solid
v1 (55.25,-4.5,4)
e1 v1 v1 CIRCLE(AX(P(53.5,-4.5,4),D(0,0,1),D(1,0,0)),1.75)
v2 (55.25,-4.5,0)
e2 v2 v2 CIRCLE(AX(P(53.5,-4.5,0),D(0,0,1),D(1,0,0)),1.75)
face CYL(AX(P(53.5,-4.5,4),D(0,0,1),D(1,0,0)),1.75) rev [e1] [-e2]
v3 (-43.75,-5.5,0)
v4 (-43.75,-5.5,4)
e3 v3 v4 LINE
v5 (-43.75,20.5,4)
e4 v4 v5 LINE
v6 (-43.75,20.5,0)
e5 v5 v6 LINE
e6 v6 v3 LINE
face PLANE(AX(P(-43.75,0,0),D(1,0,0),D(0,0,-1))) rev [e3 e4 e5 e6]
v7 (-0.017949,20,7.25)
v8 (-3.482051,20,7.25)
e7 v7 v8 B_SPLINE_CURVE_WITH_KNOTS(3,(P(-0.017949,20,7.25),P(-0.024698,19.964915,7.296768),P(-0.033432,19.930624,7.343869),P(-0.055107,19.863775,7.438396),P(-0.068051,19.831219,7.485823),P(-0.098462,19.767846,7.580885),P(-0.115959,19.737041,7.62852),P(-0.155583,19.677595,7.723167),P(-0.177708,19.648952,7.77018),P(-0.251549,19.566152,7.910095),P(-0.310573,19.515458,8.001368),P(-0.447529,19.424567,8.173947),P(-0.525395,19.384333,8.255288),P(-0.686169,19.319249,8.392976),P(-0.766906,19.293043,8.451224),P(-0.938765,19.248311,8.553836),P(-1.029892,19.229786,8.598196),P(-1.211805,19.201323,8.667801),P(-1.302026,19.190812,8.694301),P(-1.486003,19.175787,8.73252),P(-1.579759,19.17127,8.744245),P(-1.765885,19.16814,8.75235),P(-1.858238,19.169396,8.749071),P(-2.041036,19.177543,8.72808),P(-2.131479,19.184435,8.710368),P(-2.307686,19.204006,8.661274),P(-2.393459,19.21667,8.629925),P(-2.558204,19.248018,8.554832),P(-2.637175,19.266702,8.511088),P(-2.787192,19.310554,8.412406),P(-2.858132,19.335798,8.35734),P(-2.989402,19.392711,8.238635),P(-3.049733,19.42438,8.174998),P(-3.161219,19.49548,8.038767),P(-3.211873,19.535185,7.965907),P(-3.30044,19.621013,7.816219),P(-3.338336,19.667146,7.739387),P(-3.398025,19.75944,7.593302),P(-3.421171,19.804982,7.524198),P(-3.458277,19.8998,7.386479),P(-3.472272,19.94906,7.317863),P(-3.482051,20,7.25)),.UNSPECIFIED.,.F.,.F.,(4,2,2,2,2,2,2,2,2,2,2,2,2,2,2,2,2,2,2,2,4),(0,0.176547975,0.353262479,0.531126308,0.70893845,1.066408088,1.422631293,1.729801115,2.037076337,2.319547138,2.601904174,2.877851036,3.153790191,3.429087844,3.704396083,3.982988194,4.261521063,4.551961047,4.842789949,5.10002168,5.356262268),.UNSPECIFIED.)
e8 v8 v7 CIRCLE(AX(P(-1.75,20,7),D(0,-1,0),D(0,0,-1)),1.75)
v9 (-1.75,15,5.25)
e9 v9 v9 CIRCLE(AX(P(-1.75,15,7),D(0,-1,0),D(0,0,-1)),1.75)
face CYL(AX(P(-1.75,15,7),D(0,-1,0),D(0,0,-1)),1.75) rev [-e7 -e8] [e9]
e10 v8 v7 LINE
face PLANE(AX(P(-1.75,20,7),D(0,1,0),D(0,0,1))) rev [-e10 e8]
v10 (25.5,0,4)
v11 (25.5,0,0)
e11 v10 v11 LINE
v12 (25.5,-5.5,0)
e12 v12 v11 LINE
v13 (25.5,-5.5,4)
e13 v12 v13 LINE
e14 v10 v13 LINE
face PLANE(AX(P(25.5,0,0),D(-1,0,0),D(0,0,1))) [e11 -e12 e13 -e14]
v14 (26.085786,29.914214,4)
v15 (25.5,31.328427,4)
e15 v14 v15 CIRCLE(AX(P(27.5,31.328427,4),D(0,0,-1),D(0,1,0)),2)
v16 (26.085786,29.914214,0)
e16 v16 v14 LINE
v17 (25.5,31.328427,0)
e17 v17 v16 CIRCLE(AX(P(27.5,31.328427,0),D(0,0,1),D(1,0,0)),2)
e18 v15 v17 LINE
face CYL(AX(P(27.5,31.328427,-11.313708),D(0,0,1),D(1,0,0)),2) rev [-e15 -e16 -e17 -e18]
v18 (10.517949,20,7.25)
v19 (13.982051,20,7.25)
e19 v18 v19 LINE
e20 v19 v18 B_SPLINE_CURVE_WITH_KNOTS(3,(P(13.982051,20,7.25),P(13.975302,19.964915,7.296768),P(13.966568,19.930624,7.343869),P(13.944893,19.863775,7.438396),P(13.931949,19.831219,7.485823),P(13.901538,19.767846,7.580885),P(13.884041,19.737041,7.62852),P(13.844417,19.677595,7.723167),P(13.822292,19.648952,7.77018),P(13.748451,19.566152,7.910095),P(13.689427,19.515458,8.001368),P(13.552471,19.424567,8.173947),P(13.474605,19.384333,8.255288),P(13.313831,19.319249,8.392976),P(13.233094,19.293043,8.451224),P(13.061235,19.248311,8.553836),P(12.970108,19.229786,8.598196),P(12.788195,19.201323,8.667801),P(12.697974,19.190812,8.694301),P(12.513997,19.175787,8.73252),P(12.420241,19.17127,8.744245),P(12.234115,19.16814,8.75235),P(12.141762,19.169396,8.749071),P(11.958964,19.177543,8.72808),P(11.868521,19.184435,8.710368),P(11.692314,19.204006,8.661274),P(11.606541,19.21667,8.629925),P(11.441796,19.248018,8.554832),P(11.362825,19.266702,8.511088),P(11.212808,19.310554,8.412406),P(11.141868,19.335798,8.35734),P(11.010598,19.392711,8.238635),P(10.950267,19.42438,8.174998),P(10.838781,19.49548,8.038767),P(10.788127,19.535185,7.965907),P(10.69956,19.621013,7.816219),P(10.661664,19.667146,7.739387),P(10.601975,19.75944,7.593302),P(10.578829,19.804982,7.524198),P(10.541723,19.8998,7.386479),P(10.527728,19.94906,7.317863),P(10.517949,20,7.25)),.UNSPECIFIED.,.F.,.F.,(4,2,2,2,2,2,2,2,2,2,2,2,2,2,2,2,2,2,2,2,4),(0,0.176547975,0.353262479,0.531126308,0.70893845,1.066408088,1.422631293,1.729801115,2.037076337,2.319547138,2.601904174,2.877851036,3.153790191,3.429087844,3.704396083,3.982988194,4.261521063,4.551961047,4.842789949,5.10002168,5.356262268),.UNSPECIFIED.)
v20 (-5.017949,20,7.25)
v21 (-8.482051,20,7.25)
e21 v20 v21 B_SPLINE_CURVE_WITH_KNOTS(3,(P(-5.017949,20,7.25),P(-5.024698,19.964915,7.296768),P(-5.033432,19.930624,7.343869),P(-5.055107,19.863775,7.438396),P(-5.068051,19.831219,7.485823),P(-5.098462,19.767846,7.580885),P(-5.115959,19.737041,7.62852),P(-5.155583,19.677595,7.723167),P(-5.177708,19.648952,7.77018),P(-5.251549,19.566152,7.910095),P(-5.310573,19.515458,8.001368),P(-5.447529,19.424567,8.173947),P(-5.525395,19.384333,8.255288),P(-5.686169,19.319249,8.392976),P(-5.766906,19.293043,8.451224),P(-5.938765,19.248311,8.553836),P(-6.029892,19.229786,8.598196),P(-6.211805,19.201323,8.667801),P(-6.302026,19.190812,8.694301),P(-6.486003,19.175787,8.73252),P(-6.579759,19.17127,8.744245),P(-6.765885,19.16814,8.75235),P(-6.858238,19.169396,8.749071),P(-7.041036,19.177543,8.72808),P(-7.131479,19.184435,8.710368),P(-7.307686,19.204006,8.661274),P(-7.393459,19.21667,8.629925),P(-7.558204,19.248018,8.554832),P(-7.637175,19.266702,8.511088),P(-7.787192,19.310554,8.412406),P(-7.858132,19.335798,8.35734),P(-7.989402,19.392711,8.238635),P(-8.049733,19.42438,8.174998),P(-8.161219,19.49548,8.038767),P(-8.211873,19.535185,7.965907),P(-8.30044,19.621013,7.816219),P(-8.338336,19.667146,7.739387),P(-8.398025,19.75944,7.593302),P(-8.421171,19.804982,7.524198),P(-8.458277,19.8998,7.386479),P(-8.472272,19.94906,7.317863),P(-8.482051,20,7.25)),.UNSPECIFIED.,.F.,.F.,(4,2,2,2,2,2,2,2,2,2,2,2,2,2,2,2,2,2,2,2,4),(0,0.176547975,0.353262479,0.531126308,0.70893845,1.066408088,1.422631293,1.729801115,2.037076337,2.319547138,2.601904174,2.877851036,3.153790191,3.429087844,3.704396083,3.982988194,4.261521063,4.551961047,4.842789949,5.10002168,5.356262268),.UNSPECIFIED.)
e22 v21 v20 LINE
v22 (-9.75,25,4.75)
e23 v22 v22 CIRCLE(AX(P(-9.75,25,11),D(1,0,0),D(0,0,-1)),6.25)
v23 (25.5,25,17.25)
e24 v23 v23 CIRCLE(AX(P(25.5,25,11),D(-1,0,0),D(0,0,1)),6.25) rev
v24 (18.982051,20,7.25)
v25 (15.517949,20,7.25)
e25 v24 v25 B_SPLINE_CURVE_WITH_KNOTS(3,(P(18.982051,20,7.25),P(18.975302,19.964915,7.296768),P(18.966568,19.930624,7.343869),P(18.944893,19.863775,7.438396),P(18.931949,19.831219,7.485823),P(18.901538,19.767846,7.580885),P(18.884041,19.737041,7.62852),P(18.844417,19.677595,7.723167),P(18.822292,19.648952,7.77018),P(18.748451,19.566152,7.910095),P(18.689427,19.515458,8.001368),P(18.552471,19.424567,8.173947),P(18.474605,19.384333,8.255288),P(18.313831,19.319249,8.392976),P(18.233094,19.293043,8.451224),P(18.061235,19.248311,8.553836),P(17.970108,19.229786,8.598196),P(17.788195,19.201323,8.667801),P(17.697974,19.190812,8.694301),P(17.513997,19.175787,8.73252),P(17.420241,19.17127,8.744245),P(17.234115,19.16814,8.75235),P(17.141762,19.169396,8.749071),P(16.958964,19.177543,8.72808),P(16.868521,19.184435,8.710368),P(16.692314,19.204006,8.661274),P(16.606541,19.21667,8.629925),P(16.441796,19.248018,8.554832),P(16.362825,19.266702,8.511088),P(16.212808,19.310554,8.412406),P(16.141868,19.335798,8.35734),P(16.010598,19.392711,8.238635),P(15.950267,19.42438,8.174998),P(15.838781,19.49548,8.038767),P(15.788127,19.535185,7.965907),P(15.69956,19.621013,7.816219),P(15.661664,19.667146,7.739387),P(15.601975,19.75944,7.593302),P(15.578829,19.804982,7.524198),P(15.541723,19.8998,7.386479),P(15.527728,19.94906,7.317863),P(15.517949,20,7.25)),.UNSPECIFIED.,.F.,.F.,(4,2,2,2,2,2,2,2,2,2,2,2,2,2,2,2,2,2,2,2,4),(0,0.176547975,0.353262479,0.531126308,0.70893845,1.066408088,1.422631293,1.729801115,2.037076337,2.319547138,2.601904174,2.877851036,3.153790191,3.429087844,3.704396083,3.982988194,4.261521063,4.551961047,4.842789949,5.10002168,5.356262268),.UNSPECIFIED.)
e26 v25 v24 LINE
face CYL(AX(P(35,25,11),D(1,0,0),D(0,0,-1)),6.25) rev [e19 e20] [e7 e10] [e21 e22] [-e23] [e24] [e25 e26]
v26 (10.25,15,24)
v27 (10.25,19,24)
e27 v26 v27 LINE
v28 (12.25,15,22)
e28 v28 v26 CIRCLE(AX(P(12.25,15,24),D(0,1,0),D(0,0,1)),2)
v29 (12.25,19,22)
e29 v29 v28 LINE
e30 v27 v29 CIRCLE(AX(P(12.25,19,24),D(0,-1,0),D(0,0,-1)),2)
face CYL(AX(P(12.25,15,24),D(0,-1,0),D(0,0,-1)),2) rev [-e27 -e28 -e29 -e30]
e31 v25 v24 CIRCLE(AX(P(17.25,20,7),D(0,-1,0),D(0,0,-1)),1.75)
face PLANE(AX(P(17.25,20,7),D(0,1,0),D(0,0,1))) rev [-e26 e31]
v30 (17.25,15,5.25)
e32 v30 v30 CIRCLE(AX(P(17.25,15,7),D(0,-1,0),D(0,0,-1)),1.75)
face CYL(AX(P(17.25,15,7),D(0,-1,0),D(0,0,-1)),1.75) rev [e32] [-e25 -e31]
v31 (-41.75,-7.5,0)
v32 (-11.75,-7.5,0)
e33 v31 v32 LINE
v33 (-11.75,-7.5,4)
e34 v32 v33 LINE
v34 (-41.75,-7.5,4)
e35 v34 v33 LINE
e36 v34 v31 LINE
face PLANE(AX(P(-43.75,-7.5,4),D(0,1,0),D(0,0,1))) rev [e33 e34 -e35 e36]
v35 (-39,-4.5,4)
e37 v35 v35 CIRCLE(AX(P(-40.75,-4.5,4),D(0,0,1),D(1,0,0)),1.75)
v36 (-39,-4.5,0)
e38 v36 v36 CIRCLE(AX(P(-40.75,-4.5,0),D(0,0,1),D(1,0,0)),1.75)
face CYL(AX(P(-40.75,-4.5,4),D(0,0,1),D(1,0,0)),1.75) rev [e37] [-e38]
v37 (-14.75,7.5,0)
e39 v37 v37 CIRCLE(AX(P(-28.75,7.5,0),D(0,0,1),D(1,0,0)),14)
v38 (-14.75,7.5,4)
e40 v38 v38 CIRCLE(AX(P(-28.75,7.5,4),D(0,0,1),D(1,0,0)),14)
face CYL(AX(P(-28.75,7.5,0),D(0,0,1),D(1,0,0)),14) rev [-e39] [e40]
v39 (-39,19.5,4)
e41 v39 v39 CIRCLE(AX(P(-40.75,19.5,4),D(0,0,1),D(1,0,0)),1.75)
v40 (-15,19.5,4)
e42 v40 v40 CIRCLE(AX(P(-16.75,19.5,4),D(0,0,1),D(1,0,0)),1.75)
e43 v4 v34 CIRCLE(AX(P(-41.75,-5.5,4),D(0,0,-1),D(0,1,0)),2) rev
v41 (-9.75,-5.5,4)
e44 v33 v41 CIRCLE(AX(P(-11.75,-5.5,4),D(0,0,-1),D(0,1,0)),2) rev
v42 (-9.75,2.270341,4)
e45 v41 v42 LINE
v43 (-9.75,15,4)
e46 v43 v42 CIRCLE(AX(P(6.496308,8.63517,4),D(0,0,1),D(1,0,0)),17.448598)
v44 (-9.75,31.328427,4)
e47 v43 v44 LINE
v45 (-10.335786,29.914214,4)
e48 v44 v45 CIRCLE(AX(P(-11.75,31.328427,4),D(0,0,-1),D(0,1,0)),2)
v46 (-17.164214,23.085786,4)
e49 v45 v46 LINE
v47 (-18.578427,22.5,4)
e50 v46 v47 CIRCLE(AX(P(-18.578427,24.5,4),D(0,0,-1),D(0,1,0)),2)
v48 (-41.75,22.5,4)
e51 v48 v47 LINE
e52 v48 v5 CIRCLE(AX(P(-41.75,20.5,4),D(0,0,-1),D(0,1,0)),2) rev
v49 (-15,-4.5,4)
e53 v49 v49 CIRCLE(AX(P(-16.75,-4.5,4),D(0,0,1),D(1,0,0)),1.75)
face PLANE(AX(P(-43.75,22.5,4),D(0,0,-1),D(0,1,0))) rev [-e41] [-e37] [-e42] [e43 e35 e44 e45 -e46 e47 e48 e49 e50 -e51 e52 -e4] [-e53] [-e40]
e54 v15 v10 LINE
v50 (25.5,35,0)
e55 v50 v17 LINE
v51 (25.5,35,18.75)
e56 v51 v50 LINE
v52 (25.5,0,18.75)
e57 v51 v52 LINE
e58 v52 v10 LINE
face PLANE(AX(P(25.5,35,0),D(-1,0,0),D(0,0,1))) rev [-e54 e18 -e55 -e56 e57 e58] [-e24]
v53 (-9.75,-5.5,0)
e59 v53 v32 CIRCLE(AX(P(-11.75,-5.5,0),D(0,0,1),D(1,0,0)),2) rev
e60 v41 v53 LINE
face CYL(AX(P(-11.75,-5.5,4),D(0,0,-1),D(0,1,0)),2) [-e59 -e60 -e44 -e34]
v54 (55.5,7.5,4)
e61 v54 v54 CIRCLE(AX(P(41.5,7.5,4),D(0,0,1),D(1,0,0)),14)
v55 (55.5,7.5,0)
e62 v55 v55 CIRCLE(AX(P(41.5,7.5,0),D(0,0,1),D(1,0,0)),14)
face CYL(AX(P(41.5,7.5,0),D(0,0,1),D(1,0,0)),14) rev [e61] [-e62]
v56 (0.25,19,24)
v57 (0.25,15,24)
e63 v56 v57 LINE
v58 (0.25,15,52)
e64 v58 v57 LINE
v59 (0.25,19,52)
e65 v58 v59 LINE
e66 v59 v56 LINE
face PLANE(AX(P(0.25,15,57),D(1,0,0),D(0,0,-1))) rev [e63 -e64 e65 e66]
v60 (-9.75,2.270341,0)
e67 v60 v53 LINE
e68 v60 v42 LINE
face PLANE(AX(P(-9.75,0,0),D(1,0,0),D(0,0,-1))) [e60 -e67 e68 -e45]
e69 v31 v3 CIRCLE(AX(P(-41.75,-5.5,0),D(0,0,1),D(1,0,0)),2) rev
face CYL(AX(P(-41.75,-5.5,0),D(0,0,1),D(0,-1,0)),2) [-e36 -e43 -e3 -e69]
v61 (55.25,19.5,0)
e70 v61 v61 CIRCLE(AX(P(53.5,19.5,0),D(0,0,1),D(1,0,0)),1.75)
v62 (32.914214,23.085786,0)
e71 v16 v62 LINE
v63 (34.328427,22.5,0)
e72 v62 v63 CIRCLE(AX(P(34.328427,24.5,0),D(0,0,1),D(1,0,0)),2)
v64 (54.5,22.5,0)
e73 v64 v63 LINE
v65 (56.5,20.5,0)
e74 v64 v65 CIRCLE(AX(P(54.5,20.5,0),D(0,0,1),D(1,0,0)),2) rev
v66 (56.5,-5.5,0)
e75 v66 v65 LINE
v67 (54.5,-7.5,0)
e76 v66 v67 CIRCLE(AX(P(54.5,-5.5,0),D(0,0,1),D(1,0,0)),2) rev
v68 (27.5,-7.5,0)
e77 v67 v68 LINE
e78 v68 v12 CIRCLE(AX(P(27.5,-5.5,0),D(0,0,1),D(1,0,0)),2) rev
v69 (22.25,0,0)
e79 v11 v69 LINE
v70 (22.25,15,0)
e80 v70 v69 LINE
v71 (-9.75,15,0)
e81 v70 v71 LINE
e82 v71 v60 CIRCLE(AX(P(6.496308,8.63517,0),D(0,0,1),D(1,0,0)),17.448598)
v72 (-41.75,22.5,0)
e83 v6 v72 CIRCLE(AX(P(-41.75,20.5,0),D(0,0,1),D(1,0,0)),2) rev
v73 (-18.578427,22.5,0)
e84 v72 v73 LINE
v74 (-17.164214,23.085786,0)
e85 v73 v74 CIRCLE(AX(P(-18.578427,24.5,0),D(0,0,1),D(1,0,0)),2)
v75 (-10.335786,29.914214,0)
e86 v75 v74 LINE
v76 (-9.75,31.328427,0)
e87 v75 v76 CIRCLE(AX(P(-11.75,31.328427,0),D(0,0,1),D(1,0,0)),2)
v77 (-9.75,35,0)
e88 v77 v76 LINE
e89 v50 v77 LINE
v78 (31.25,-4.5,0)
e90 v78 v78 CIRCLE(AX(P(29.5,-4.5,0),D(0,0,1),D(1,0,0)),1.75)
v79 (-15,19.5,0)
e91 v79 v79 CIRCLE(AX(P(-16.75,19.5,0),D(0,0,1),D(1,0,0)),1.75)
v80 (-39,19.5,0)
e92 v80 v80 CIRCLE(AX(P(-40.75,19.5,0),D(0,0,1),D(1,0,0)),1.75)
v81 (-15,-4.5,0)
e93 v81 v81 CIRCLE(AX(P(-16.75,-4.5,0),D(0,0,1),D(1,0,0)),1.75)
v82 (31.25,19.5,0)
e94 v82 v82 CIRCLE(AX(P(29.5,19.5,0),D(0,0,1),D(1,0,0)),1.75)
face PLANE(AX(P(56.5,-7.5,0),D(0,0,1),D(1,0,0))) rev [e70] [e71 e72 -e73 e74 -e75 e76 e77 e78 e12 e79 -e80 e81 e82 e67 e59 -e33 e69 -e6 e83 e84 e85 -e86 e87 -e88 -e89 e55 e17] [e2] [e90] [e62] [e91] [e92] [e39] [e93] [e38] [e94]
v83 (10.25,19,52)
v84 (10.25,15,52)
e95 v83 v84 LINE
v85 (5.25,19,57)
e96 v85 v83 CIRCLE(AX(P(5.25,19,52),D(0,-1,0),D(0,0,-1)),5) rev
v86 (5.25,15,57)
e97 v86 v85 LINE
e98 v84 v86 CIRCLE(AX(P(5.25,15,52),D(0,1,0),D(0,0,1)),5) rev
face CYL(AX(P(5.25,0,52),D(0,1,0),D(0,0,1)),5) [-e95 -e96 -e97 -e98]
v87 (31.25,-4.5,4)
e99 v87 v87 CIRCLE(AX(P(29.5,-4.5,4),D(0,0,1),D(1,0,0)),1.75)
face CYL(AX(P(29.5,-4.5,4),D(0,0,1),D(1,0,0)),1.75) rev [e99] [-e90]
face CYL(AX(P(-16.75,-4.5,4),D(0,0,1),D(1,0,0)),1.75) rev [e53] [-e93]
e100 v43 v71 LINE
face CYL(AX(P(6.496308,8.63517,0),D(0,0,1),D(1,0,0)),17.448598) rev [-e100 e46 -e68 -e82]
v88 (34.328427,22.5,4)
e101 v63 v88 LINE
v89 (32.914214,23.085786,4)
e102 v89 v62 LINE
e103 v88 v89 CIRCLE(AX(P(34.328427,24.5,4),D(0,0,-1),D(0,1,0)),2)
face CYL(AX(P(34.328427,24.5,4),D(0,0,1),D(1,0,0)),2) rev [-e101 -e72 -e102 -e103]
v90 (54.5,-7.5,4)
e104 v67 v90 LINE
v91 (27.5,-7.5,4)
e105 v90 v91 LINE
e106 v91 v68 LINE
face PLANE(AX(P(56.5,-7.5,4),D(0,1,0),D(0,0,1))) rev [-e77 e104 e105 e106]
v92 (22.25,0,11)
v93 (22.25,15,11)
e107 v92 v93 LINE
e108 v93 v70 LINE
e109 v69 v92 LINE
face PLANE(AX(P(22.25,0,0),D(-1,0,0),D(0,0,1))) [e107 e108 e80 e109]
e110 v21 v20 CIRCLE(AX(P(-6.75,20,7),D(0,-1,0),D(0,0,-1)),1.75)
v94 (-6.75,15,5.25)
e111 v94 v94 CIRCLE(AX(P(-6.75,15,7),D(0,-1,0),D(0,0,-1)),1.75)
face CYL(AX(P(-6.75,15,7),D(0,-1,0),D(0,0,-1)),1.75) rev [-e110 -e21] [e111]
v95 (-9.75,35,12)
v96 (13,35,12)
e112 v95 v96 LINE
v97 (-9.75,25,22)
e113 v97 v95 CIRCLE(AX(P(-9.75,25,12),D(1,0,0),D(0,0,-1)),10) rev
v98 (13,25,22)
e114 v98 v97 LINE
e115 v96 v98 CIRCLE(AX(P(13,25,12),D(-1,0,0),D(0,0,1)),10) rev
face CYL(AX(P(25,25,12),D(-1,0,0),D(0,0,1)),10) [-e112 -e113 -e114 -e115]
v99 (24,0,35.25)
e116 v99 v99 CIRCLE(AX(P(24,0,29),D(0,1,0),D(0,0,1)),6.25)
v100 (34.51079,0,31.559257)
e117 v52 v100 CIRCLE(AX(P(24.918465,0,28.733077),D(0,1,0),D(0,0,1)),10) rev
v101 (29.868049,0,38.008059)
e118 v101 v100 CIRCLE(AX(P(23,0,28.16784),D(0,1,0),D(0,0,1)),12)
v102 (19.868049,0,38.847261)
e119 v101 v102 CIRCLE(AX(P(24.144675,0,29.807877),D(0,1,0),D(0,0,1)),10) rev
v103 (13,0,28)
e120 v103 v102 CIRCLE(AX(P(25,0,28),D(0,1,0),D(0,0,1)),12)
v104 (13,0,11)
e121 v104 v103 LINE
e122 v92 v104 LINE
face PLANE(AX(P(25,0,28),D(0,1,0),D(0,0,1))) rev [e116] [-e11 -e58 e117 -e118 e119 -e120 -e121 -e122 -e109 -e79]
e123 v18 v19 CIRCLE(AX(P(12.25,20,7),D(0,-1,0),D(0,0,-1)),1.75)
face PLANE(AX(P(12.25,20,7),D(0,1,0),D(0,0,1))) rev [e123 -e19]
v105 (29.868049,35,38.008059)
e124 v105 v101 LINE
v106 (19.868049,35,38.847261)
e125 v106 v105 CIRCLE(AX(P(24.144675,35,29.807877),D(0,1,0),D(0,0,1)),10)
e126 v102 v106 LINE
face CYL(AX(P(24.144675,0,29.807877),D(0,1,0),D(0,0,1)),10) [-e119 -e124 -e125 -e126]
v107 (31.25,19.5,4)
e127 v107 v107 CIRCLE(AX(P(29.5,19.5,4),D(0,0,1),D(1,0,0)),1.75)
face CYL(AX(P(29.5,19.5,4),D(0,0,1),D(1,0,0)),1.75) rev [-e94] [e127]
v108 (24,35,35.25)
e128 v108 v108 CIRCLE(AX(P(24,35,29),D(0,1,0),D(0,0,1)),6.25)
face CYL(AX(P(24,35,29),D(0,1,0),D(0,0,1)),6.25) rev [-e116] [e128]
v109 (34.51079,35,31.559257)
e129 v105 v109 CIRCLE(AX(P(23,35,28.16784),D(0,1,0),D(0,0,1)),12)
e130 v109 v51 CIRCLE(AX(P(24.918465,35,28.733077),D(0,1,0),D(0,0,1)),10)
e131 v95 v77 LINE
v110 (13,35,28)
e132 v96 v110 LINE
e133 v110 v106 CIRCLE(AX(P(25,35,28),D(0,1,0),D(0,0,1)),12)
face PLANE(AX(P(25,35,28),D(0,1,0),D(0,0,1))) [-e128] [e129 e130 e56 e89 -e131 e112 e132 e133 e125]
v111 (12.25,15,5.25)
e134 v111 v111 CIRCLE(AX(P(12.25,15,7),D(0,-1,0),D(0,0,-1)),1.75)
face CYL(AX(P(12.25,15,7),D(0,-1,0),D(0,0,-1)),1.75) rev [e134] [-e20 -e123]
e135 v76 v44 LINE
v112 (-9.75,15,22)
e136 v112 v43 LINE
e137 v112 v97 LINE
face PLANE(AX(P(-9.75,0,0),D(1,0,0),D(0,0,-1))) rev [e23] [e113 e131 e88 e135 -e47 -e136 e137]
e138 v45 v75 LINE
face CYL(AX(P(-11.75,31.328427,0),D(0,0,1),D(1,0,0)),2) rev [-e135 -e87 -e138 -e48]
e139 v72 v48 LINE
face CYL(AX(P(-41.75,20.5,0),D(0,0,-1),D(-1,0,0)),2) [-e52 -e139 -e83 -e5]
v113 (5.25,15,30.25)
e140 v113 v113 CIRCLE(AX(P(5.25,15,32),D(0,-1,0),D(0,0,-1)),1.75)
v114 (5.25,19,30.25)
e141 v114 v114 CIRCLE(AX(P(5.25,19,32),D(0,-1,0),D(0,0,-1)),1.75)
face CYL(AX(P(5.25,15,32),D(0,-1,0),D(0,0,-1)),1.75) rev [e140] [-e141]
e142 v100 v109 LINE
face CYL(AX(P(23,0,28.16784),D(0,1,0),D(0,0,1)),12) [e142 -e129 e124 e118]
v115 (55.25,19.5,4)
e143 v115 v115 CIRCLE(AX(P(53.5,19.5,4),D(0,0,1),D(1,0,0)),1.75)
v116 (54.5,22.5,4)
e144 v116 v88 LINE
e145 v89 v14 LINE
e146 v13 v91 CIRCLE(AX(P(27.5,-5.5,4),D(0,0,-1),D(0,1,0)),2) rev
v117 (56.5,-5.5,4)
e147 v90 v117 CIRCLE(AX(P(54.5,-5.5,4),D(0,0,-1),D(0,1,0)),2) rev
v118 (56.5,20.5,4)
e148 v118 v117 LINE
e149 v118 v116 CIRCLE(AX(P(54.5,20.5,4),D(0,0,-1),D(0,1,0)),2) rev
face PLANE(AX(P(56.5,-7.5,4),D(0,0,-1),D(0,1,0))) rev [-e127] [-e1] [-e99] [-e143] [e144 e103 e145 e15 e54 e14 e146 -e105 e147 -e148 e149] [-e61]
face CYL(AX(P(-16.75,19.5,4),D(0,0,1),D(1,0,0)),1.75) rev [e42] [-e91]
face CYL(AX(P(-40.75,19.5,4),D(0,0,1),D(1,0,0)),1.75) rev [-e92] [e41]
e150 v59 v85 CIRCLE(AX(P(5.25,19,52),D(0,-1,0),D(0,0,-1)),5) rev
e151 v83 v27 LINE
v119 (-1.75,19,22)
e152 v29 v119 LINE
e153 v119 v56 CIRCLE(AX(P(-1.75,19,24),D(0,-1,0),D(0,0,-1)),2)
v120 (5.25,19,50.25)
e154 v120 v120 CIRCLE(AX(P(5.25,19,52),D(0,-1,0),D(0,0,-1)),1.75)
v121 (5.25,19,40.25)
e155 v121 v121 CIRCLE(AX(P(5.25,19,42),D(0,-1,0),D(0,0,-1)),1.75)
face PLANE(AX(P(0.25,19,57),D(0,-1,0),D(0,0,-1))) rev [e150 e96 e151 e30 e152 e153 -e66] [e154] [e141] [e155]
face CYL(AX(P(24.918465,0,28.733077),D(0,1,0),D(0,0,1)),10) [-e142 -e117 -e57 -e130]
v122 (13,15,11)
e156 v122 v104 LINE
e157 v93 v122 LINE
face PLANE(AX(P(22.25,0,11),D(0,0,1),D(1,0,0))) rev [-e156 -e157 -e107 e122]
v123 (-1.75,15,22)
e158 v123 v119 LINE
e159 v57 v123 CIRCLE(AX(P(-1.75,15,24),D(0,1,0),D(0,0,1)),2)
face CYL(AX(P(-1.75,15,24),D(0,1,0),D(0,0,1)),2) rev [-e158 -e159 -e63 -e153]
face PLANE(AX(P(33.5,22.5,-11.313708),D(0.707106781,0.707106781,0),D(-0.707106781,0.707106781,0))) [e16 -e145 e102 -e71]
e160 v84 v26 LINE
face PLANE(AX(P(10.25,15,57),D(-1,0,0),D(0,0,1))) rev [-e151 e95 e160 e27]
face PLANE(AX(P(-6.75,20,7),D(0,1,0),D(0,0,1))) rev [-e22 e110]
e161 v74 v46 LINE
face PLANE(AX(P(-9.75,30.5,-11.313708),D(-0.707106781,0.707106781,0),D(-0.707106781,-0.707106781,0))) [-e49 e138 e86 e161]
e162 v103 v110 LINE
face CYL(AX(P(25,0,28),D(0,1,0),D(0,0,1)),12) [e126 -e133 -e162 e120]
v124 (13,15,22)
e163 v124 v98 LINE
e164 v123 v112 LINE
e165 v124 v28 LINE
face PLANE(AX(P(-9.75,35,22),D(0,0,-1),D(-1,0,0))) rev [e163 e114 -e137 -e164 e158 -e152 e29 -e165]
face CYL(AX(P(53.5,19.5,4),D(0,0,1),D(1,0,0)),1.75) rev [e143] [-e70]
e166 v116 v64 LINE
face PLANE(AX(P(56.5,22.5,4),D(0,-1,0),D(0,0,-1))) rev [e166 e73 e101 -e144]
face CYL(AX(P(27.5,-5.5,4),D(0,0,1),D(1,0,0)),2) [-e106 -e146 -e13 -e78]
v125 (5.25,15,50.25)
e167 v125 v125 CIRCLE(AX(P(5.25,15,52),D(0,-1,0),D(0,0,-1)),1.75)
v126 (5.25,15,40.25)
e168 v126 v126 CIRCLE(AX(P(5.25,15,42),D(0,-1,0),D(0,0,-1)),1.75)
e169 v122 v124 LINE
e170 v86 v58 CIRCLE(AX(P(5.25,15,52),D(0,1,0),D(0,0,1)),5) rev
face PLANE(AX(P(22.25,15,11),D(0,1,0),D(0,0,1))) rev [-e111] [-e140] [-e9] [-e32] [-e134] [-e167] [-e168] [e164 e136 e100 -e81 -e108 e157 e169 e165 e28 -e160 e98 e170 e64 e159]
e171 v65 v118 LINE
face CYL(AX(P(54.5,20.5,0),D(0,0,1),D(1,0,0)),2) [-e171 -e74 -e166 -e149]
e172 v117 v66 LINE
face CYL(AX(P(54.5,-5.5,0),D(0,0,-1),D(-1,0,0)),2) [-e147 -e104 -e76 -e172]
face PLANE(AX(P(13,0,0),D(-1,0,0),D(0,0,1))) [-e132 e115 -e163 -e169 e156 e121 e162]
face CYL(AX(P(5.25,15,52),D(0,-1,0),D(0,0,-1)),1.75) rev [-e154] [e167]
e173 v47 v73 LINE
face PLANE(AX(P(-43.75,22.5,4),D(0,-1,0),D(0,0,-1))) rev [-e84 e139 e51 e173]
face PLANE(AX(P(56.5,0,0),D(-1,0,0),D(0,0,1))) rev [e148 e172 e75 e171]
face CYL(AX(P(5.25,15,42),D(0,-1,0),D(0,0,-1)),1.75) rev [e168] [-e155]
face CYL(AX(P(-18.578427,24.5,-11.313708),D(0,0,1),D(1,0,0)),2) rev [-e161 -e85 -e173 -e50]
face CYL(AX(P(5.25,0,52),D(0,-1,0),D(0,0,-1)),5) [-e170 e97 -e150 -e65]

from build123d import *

# Parameters (mm, degrees)
EXTRUDE_1_DEPTH                  = 35
SKETCH_2_W                       = 22
SKETCH_2_H                       = 35
EXTRUDE_2_DEPTH                  = 22.75
SKETCH_3_W                       = 11
SKETCH_3_H                       = 15
CUT_EXTRUDE_1_DEPTH              = 32
HOLE_WIZARD_12_5_12_5_1_D        = 12.5
HOLE_WIZARD_12_5_12_5_2_D        = 12.5
HOLE_WIZARD_3_5_3_5_1_D          = 3.5
HOLE_WIZARD_3_5_3_5_1_DEPTH      = 5
SKETCH_10_W                      = 9.5
SKETCH_10_H                      = 18.75
CUT_EXTRUDE_2_DEPTH              = 64.639610362
SKETCH_11_W                      = 22.75
SKETCH_11_H                      = 11
CUT_EXTRUDE_3_DEPTH              = 15
FILLET_2_R                       = 10
SKETCH_13_W                      = 4
SKETCH_13_H                      = 30
EXTRUDE_3_DEPTH                  = 31
SKETCH_16_W                      = 1.75
SKETCH_16_H                      = 4
HOLE_WIZARD_3_5_3_5_2_AT_2_COUNT = 2
HOLE_WIZARD_3_5_3_5_2_AT_2_PITCH = 24
HOLE_WIZARD_3_5_3_5_2_AT_3_COUNT = 2
HOLE_WIZARD_3_5_3_5_2_AT_3_PITCH = 33.941125497
HOLE_WIZARD_3_5_3_5_2_AT_4_COUNT = 2
HOLE_WIZARD_3_5_3_5_2_AT_4_PITCH = 24
SKETCH_17_R                      = 14
CUT_EXTRUDE_4_DEPTH              = 76.494728698
SKETCH_19_W                      = 4
SKETCH_19_H                      = 30
EXTRUDE_5_DEPTH                  = 34
SKETCH_20_R                      = 14
CUT_EXTRUDE_5_DEPTH              = 76.494728698
SKETCH_22_W                      = 1.75
SKETCH_22_H                      = 4
HOLE_WIZARD_3_5_3_5_3_AT_2_COUNT = 2
HOLE_WIZARD_3_5_3_5_3_AT_2_PITCH = 24
HOLE_WIZARD_3_5_3_5_3_AT_3_COUNT = 2
HOLE_WIZARD_3_5_3_5_3_AT_3_PITCH = 33.941125497
HOLE_WIZARD_3_5_3_5_3_AT_4_COUNT = 2
HOLE_WIZARD_3_5_3_5_3_AT_4_PITCH = 24
EXTRUDE_6_DEPTH                  = 4
EXTRUDE_7_DEPTH                  = 4
SKETCH_26_W                      = 10
SKETCH_26_H                      = 4
EXTRUDE_8_DEPTH                  = 35
HOLE_WIZARD_3_5_3_5_4_D          = 3.5
FILLET_7_R                       = 2
FILLET_9_R                       = 5
FILLET_10_R                      = 10
FILLET_12_R                      = 10
FILLET_13_R                      = 2
FILLET_14_R                      = 2
CUT_EXTRUDE_6_DEPTH              = 86.007352664


# Some blends are built 0.0001 mm under size
with BuildPart() as part:
    # Эскиз1 → Бобышка-Вытянуть1 (new body)
    with BuildSketch(Plane(origin=(0, 35, 0), x_dir=(1, 0, 0), z_dir=(0, 1, 0))):
        with BuildLine():
            Line((35, 0), (13, 0))
            Line((13, 0), (13, -28))
            ThreePointArc((13, -28), (16.514718626, -36.485281374), (25, -40))
            ThreePointArc((25, -40), (32.16515139, -35.913807126), (35, -28.167840434))
            Line((35, -28.167840434), (35, 0))
        make_face()
    extrude(amount=-EXTRUDE_1_DEPTH)

    # Эскиз2 → Бобышка-Вытянуть2 (add)
    with BuildSketch(Plane.ZY.offset(-13)):
        with Locations((11, 17.5)):
            Rectangle(SKETCH_2_W, SKETCH_2_H)
    extrude(amount=EXTRUDE_2_DEPTH)

    # Эскиз3 → Вырез-Вытянуть1 (cut)
    with BuildSketch(Plane.ZY.offset(9.75)):
        with Locations((5.5, 7.5)):
            Rectangle(SKETCH_3_W, SKETCH_3_H)
    extrude(amount=-CUT_EXTRUDE_1_DEPTH, mode=Mode.SUBTRACT)

    # Диаметр отверстия Ø12.5 (12.5)1 (through all)
    with Locations(Plane(origin=(0, 35, 0), x_dir=(1, 0, 0), z_dir=(0, 1, 0))):
        with Locations((24, -29)):
            Hole(HOLE_WIZARD_12_5_12_5_1_D / 2)

    # Диаметр отверстия Ø12.5 (12.5)2 (through all)
    with Locations(Plane(origin=(35, 0, 0), x_dir=(0, 0, -1), z_dir=(1, 0, 0))):
        with Locations((-11, 25)):
            Hole(HOLE_WIZARD_12_5_12_5_2_D / 2)

    # Диаметр отверстия Ø3.5 (3.5)1
    with Locations(Plane(origin=(0, 15, 0), x_dir=(-1, 0, 0), z_dir=(0, -1, 0))):
        with Locations((-17.25, -7), (6.75, -7), (-12.25, -7), (1.75, -7)):
            Hole(HOLE_WIZARD_3_5_3_5_1_D / 2, depth=HOLE_WIZARD_3_5_3_5_1_DEPTH)

    # Эскиз10 → Вырез-Вытянуть2 (cut, through all)
    with BuildSketch(Plane.XZ):
        with Locations((30.25, 9.375)):
            Rectangle(SKETCH_10_W, SKETCH_10_H)
    extrude(amount=-CUT_EXTRUDE_2_DEPTH, mode=Mode.SUBTRACT)

    # Эскиз11 → Вырез-Вытянуть3 (cut)
    with BuildSketch(Plane.XZ):
        with Locations((1.625, 16.5)):
            Rectangle(SKETCH_11_W, SKETCH_11_H)
    extrude(amount=-CUT_EXTRUDE_3_DEPTH, mode=Mode.SUBTRACT)

    # Скругление2
    fillet_2_edges = [part.edges().sort_by_distance(p)[0] for p in [
        (25, 17.5, 40),
    ]]
    fillet(fillet_2_edges, radius=FILLET_2_R)

    # Эскиз19 → Бобышка-Вытянуть5 (add)
    with BuildSketch(Plane.ZY.offset(9.75)):
        with Locations((2, 7.5)):
            Rectangle(SKETCH_19_W, SKETCH_19_H)
    extrude(amount=EXTRUDE_5_DEPTH)

    # Эскиз20 → Вырез-Вытянуть5 (cut, through all)
    with BuildSketch(Plane.XY.offset(4)):
        with Locations((-28.75, 7.5)):
            Circle(SKETCH_20_R)
    extrude(amount=-CUT_EXTRUDE_5_DEPTH, mode=Mode.SUBTRACT)

    # Эскиз22 → Диаметр отверстия Ø3.5 (3.5)3 (revolve, cut)
    with BuildSketch(Plane(origin=(-16.75, 19.5, 4), x_dir=(0, -1, 0), z_dir=(1, 0, 0))):
        with Locations((0.875, 2)):
            Rectangle(SKETCH_22_W, SKETCH_22_H)
    hole_wizard_3_5_3_5_3 = revolve(axis=Axis((-16.75, 19.5, 10.35), (0, 0, -1)), mode=Mode.SUBTRACT)

    # Диаметр отверстия Ø3.5 (3.5)3 at 2: Диаметр отверстия Ø3.5 (3.5)3 ×2
    with Locations(*[(0, -i * HOLE_WIZARD_3_5_3_5_3_AT_2_PITCH, 0) for i in range(1, HOLE_WIZARD_3_5_3_5_3_AT_2_COUNT)]):
        add(hole_wizard_3_5_3_5_3, mode=Mode.SUBTRACT)

    # Диаметр отверстия Ø3.5 (3.5)3 at 3: Диаметр отверстия Ø3.5 (3.5)3 ×2
    with Locations(*[Vector(-0.7071067811865475, -0.7071067811865476, 0) * (i * HOLE_WIZARD_3_5_3_5_3_AT_3_PITCH) for i in range(1, HOLE_WIZARD_3_5_3_5_3_AT_3_COUNT)]):
        add(hole_wizard_3_5_3_5_3, mode=Mode.SUBTRACT)

    # Диаметр отверстия Ø3.5 (3.5)3 at 4: Диаметр отверстия Ø3.5 (3.5)3 ×2
    with Locations(*[(-i * HOLE_WIZARD_3_5_3_5_3_AT_4_PITCH, 0, 0) for i in range(1, HOLE_WIZARD_3_5_3_5_3_AT_4_COUNT)]):
        add(hole_wizard_3_5_3_5_3, mode=Mode.SUBTRACT)

    # Эскиз24 → Бобышка-Вытянуть6 (add)
    with BuildSketch(Plane.XY.offset(4)):
        Polygon((-9.75, 30.5), (-17.75, 22.5), (-9.75, 22.5), align=None)
    extrude(amount=-EXTRUDE_6_DEPTH)



with BuildPart() as body_2:
    # Эскиз13 → Бобышка-Вытянуть3 (new body)
    with BuildSketch(Plane(origin=(25.5, 0, 0), x_dir=(0, 0, -1), z_dir=(1, 0, 0))):
        with Locations((-2, 7.5)):
            Rectangle(SKETCH_13_W, SKETCH_13_H)
    extrude(amount=EXTRUDE_3_DEPTH)

    # Эскиз16 → Диаметр отверстия Ø3.5 (3.5)2 (revolve, cut)
    with BuildSketch(Plane(origin=(29.5, -4.5, 4), x_dir=(0, -1, 0), z_dir=(1, 0, 0))):
        with Locations((0.875, 2)):
            Rectangle(SKETCH_16_W, SKETCH_16_H)
    hole_wizard_3_5_3_5_2 = revolve(axis=Axis((29.5, -4.5, 10.35), (0, 0, -1)), mode=Mode.SUBTRACT)

    # Диаметр отверстия Ø3.5 (3.5)2 at 2: Диаметр отверстия Ø3.5 (3.5)2 ×2
    with Locations(*[(0, i * HOLE_WIZARD_3_5_3_5_2_AT_2_PITCH, 0) for i in range(1, HOLE_WIZARD_3_5_3_5_2_AT_2_COUNT)]):
        add(hole_wizard_3_5_3_5_2, mode=Mode.SUBTRACT)

    # Диаметр отверстия Ø3.5 (3.5)2 at 3: Диаметр отверстия Ø3.5 (3.5)2 ×2
    with Locations(*[Vector(0.7071067811865475, 0.7071067811865476, 0) * (i * HOLE_WIZARD_3_5_3_5_2_AT_3_PITCH) for i in range(1, HOLE_WIZARD_3_5_3_5_2_AT_3_COUNT)]):
        add(hole_wizard_3_5_3_5_2, mode=Mode.SUBTRACT)

    # Диаметр отверстия Ø3.5 (3.5)2 at 4: Диаметр отверстия Ø3.5 (3.5)2 ×2
    with Locations(*[(i * HOLE_WIZARD_3_5_3_5_2_AT_4_PITCH, 0, 0) for i in range(1, HOLE_WIZARD_3_5_3_5_2_AT_4_COUNT)]):
        add(hole_wizard_3_5_3_5_2, mode=Mode.SUBTRACT)

    # Эскиз17 → Вырез-Вытянуть4 (cut, through all)
    with BuildSketch(Plane.XY.offset(4)):
        with Locations((41.5, 7.5)):
            Circle(SKETCH_17_R)
    extrude(amount=-CUT_EXTRUDE_4_DEPTH, mode=Mode.SUBTRACT)


with BuildPart() as part_1:
    add(part.part)

    add(body_2.part)  # Бобышка-Вытянуть7 merges body 2
    # Эскиз25 → Бобышка-Вытянуть7 (add)
    with BuildSketch(Plane.XY.offset(4)):
        Polygon((33.5, 22.5), (25.5, 30.5), (25.5, 22.5), align=None)
    extrude(amount=-EXTRUDE_7_DEPTH)

    # Эскиз26 → Бобышка-Вытянуть8 (add)
    with BuildSketch(Plane.XY.offset(22)):
        with Locations((5.25, 17)):
            Rectangle(SKETCH_26_W, SKETCH_26_H)
    extrude(amount=EXTRUDE_8_DEPTH)

    # Диаметр отверстия Ø3.5 (3.5)4 (through all)
    with Locations(Plane(origin=(0, 15, 0), x_dir=(-1, 0, 0), z_dir=(0, -1, 0))):
        with Locations((-5.25, -52), (-5.25, -42), (-5.25, -32)):
            Hole(HOLE_WIZARD_3_5_3_5_4_D / 2)

    # Скругление7
    fillet_7_edges = [part_1.edges().sort_by_distance(p)[0] for p in [
        (0.25, 17, 22),
        (10.25, 17, 22),
    ]]
    fillet(fillet_7_edges, radius=FILLET_7_R)

    # Скругление9
    fillet_9_edges = [part_1.edges().sort_by_distance(p)[0] for p in [
        (0.25, 17, 57),
        (10.25, 17, 57),
    ]]
    fillet(fillet_9_edges, radius=FILLET_9_R - 0.0001)  # a hair under: the kernel refuses the full size

    # Скругление10
    # the kernel refuses this fillet: 10 mm, written as the material it takes off along each edge
    with BuildSketch(Plane(origin=(35, -32.046488893, 18.75), x_dir=(-0.03816406367220006, 0, 0.999271486756239), z_dir=(0, 1, 0))) as fillet_10_piece_1:
        with BuildLine():
            CenterArc((10.360556073, -9.693195649), FILLET_10_R, 75.770650452, 103.082689776)
            Line((0.362558605, -9.493079124), (-0.637241142, -9.473067472))
            ThreePointArc((-0.637241142, -9.473067472), (-0.817992184, -4.784703626), (-0.999271487, -0.038164064))
            Line((-0.999271487, -0.038164064), (-0.038164064, 0.999271487))
            ThreePointArc((-0.038164064, 0.999271487), (9.372815349, 1.358694549), (13.064399506, 0.969319565))
            Line((13.064399506, 0.969319565), (12.818595557, 0))
        make_face()
    extrude(amount=99.092977786, mode=Mode.SUBTRACT)

    # Скругление12
    fillet_12_edges = [part_1.edges().sort_by_distance(p)[0] for p in [
        (1.625, 35, 22),
    ]]
    fillet(fillet_12_edges, radius=FILLET_12_R)

    # Скругление13
    fillet_13_edges = [part_1.edges().sort_by_distance(p)[0] for p in [
        (-9.75, 30.5, 2),
        (-9.75, -7.5, 2),
        (-43.75, 22.5, 2),
        (-43.75, -7.5, 2),
        (-17.75, 22.5, 2),
    ]]
    fillet(fillet_13_edges, radius=FILLET_13_R)

    # Скругление14
    fillet_14_edges = [part_1.edges().sort_by_distance(p)[0] for p in [
        (56.5, 22.5, 2),
        (25.5, 30.5, 2),
        (33.5, 22.5, 2),
        (25.5, -7.5, 2),
        (56.5, -7.5, 2),
    ]]
    fillet(fillet_14_edges, radius=FILLET_14_R)

    # Эскиз32 → Вырез-Вытянуть6 (cut, through all)
    with BuildSketch(Plane.XY.offset(4)):
        with BuildLine():
            Line((-9.75, 2.270340952), (-9.75, 15))
            ThreePointArc((-9.75, 15), (-10.952290213, 8.635170476), (-9.75, 2.270340952))
        make_face()
    extrude(amount=-CUT_EXTRUDE_6_DEPTH, mode=Mode.SUBTRACT)


solid = part_1.part
